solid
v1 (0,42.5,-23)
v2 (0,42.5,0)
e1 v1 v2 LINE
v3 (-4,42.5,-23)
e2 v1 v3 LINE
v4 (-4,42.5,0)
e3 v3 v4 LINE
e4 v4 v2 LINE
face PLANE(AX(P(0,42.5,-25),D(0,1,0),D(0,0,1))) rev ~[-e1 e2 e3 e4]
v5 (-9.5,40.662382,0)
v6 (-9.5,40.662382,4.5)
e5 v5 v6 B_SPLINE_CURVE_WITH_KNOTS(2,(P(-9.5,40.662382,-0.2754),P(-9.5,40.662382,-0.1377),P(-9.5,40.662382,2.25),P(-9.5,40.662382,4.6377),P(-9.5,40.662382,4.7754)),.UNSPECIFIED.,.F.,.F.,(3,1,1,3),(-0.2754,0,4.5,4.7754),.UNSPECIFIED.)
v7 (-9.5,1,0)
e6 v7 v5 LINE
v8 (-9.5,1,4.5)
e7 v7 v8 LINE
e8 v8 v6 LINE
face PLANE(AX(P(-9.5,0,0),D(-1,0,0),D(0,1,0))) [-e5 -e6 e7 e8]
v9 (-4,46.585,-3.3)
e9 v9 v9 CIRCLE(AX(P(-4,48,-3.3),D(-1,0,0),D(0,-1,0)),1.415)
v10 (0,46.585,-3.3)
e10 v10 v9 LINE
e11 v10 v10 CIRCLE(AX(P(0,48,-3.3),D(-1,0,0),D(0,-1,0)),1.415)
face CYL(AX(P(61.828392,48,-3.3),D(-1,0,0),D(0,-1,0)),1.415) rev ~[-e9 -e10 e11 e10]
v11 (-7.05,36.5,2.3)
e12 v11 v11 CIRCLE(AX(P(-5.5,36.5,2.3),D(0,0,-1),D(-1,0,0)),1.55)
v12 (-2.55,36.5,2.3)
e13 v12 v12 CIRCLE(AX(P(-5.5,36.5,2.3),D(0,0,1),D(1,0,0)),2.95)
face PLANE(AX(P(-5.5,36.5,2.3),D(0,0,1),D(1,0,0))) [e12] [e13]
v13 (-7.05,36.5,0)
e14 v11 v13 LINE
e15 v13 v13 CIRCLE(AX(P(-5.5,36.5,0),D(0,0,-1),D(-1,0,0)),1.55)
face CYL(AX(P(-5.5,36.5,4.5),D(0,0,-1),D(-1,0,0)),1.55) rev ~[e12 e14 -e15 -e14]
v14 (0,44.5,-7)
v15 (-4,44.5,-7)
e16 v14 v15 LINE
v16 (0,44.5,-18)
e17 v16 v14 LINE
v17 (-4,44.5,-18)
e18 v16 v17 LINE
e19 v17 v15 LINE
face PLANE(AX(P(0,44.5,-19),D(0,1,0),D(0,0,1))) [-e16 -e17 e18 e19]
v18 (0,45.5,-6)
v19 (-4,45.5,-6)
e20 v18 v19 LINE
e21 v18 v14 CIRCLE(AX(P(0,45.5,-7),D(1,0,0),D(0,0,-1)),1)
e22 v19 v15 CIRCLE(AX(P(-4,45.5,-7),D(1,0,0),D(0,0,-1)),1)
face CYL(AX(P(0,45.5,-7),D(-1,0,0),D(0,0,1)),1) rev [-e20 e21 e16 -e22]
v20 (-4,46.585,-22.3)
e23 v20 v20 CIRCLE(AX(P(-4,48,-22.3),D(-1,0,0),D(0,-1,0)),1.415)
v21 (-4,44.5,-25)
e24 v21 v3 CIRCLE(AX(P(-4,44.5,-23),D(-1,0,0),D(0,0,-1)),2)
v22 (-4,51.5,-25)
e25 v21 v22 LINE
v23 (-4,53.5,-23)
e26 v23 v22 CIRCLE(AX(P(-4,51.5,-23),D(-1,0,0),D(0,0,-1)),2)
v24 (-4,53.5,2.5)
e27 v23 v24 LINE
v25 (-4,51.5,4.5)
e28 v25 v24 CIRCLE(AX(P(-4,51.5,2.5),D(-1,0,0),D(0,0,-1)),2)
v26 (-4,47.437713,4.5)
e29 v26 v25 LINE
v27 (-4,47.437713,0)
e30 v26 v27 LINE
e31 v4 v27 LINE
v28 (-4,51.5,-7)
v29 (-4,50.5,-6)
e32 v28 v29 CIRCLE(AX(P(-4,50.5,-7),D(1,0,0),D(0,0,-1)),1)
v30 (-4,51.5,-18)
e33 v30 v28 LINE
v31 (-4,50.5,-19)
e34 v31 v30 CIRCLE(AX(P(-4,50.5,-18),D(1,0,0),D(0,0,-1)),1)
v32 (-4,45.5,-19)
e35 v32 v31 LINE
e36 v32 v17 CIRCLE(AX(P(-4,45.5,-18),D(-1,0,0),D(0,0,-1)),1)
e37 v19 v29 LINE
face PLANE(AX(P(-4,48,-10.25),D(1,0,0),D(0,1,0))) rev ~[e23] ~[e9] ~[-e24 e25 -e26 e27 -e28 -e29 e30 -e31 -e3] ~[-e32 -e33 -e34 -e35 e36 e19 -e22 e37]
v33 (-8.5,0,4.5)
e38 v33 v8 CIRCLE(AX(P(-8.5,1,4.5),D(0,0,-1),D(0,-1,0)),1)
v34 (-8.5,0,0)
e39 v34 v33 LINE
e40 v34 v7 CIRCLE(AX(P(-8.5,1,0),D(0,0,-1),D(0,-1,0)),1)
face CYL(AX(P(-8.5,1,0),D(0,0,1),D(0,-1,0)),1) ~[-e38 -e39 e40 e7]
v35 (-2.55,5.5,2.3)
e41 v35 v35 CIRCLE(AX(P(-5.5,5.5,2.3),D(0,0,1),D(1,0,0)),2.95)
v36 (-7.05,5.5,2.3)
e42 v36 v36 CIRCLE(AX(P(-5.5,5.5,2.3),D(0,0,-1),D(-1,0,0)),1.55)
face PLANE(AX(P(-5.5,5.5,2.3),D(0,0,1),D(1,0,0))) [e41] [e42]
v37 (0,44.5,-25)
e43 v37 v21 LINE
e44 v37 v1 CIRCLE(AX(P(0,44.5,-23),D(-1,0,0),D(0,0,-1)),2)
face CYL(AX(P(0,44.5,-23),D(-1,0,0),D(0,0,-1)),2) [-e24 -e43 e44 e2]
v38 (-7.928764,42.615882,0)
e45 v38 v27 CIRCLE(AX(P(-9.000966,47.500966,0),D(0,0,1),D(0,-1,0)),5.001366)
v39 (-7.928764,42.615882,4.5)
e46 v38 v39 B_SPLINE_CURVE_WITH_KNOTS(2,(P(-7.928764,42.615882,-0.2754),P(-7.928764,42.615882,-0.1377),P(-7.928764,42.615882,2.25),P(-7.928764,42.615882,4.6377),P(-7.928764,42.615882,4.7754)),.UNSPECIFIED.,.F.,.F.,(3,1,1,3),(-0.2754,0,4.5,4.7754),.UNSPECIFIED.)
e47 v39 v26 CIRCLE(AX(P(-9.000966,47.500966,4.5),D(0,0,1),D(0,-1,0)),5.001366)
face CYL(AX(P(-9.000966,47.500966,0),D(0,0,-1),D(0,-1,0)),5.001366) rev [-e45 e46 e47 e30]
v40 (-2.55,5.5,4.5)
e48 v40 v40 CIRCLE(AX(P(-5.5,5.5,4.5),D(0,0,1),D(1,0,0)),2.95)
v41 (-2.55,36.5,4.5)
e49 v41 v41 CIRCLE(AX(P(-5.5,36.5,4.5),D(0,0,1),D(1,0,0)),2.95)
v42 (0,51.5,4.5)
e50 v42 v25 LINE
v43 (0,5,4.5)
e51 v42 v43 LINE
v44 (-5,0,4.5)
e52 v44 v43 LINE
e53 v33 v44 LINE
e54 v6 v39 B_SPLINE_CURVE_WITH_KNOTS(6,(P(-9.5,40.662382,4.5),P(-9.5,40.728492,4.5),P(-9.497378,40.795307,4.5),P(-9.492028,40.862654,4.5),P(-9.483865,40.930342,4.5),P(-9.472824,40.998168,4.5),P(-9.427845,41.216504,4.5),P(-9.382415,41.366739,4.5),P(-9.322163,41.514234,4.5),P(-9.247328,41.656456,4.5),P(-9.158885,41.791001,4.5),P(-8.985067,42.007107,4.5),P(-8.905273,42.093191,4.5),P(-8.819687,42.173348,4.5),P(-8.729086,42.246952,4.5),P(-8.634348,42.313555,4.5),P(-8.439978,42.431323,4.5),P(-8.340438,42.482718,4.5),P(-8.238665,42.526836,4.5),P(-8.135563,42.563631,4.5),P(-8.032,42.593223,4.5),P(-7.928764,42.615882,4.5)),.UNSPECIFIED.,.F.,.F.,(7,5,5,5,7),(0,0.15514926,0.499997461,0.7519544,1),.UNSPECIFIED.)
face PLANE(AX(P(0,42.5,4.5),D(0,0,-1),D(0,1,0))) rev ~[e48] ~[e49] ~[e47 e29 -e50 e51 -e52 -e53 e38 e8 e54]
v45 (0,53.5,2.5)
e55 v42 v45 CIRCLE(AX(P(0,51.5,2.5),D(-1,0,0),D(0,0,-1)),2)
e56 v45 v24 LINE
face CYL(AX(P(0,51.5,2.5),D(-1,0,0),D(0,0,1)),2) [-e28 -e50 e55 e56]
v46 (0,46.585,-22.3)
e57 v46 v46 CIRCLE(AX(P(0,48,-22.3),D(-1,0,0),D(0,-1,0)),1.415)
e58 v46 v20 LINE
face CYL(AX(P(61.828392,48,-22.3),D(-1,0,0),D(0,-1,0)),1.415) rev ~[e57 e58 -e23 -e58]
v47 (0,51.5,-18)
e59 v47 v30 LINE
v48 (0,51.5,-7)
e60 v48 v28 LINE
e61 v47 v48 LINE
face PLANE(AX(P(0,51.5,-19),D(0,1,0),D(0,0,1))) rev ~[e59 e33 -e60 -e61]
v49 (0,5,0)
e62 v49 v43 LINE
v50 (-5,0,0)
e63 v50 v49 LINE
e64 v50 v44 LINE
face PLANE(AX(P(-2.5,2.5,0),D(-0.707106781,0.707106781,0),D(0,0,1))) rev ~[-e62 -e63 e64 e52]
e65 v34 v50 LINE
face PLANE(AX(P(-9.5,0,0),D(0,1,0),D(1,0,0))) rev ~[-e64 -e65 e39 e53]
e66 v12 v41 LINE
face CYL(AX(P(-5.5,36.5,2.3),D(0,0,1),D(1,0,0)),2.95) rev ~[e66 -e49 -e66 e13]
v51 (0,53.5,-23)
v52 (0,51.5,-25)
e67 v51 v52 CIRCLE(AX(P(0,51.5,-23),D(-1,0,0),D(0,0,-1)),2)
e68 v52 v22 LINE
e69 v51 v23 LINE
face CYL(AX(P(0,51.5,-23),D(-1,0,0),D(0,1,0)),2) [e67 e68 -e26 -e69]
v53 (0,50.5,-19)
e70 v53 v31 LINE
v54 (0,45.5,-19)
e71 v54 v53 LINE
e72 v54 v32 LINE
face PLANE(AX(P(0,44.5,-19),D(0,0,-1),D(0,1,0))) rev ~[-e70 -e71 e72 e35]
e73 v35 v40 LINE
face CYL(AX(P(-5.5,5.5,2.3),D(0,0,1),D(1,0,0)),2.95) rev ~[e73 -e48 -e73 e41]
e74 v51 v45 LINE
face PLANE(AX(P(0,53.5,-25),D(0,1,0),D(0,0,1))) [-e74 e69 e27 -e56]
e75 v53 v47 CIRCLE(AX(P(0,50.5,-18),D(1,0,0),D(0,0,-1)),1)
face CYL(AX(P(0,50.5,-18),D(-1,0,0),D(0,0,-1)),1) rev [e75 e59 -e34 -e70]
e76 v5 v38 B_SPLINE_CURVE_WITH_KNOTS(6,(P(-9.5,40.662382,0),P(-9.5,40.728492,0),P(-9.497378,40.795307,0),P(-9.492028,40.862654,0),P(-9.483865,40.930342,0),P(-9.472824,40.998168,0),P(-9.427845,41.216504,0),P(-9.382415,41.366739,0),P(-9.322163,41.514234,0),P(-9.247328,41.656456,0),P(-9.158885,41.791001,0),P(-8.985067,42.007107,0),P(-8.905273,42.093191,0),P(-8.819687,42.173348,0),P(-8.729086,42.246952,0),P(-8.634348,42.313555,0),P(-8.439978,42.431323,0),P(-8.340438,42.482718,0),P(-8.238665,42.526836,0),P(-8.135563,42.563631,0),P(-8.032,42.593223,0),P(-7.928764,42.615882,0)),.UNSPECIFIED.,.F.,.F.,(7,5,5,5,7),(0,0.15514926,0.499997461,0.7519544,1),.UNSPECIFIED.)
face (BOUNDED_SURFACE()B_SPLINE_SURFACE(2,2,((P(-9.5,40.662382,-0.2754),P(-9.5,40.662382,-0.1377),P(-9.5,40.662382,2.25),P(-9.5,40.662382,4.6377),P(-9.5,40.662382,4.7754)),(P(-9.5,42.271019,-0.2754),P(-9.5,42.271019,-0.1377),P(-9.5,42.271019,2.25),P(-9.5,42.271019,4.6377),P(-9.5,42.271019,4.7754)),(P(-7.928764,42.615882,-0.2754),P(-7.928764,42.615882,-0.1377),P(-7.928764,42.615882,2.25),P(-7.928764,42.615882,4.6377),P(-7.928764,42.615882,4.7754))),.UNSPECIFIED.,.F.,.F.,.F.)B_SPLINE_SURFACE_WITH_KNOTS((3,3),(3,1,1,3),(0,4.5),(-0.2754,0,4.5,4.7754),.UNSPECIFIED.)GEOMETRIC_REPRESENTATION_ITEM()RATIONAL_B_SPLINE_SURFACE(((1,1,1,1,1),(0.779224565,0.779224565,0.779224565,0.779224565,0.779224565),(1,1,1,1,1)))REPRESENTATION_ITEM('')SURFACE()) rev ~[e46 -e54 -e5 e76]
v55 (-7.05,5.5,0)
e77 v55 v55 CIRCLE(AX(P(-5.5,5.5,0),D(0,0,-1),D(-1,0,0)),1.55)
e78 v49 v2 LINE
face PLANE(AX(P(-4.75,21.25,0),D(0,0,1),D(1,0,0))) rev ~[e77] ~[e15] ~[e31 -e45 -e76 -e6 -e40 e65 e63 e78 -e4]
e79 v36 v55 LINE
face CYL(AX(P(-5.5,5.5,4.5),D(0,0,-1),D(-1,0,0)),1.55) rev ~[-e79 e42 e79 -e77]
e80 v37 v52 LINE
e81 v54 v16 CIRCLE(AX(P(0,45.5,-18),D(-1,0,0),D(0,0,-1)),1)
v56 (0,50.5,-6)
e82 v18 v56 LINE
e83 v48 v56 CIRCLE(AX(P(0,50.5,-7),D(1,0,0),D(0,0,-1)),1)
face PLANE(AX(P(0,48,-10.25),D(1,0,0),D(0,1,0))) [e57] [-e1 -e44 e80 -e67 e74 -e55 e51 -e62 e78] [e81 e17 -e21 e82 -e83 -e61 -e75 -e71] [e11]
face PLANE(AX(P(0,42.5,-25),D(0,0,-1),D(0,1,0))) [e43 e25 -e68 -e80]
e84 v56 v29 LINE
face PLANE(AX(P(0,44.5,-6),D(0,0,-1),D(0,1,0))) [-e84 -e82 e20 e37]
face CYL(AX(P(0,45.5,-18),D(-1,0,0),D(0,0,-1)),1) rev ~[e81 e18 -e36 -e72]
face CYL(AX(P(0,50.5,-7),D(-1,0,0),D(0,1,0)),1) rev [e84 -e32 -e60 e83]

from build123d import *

# Parameters (mm, degrees)
F0_W           = 9.5
F0_H           = 42.5
F1_DEPTH       = 4.5
F3_D           = 3.1
F3_CBORE_D     = 5.9
F3_CBORE_DEPTH = 2.2
F4_W           = 11
F4_H           = 29.5
F5_DEPTH       = 4
F7_D           = 2.83
F8_W           = 7
F8_H           = 13
F9_DEPTH       = 25
F10_T1_DEPTH   = 4.5
F11_R          = 2
F12_SIZE       = 5
F13_R          = 1


# Not quite as in the source:
# - a fillet or chamfer that OpenCascade refuses, or shapes differently, is made with other operations: its cross-section is extruded or revolved along the edge and cut away or added


with BuildPart() as f1:
    # F0 (on Top) → F1 (new body)
    with BuildSketch(Plane.XY):
        with Locations((-4.75, 21.25)):
            Rectangle(F0_W, F0_H)
    extrude(amount=F1_DEPTH)

    # F3 (through all)
    with Locations(Plane.XY.offset(4.5)):
        with Locations((-5.5, 36.5), (-5.5, 5.5)):
            CounterBoreHole(F3_D / 2, F3_CBORE_D / 2, F3_CBORE_DEPTH)

    # F4 (on Right) → F5 (join)
    with BuildSketch(Plane.YZ):
        with Locations((48, -10.25)):
            Rectangle(F4_W, F4_H)
    extrude(amount=-F5_DEPTH)

    # F7 (through all)
    with Locations(Plane.YZ):
        with Locations((48, -3.3), (48, -22.3)):
            Hole(F7_D / 2)

    # F8 (on face) → F9 (cut)
    with BuildSketch(Plane.YZ):
        with Locations((48, -12.5)):
            Rectangle(F8_W, F8_H)
    extrude(amount=-F9_DEPTH, mode=Mode.SUBTRACT)

    # F10: fillet of radius 5 on 1 edges, made by hand

    # F10_s2 → F10_t1 (join)
    with BuildSketch(Plane.XY):
        with BuildLine():
            ThreePointArc((-9.0009656854, 42.4996), (-5.4644660941, 43.9644660941), (-3.9996, 47.5009656854))
            Line((-3.9996, 47.5009656854), (-3.4994634315, 47.5009656854))
            ThreePointArc((-3.4994634315, 47.5009656854), (-3.4998634315, 45.0004828427), (-3.4998634315, 42.5))
            Line((-3.4998634315, 42.5), (-4, 41.9998634315))
            ThreePointArc((-4, 41.9998634315), (-6.5004828427, 41.9998634315), (-9.0009656854, 41.9994634315))
            Line((-9.0009656854, 41.9994634315), (-9.0009656854, 42.4996))
        make_face()
    extrude(amount=F10_T1_DEPTH)

    # F11
    f11_edges = [f1.edges().sort_by_distance(p)[0] for p in [
        (-2, 53.5, 4.5),
        (-2, 53.5, -25),
        (-2, 42.5, -25),
        (-9.5, 42.5, 2.25),
    ]]
    fillet(f11_edges, radius=F11_R)

    # F12
    f12_edges = [f1.edges().sort_by_distance(p)[0] for p in [
        (0, 0, 2.25),
    ]]
    chamfer(f12_edges, length=F12_SIZE)

    # F13
    f13_edges = [f1.edges().sort_by_distance(p)[0] for p in [
        (-2, 44.5, -6),
        (-2, 51.5, -6),
        (-2, 44.5, -19),
        (-2, 51.5, -19),
        (-9.5, 0, 2.25),
    ]]
    fillet(f13_edges, radius=F13_R)


solid = f1.part
